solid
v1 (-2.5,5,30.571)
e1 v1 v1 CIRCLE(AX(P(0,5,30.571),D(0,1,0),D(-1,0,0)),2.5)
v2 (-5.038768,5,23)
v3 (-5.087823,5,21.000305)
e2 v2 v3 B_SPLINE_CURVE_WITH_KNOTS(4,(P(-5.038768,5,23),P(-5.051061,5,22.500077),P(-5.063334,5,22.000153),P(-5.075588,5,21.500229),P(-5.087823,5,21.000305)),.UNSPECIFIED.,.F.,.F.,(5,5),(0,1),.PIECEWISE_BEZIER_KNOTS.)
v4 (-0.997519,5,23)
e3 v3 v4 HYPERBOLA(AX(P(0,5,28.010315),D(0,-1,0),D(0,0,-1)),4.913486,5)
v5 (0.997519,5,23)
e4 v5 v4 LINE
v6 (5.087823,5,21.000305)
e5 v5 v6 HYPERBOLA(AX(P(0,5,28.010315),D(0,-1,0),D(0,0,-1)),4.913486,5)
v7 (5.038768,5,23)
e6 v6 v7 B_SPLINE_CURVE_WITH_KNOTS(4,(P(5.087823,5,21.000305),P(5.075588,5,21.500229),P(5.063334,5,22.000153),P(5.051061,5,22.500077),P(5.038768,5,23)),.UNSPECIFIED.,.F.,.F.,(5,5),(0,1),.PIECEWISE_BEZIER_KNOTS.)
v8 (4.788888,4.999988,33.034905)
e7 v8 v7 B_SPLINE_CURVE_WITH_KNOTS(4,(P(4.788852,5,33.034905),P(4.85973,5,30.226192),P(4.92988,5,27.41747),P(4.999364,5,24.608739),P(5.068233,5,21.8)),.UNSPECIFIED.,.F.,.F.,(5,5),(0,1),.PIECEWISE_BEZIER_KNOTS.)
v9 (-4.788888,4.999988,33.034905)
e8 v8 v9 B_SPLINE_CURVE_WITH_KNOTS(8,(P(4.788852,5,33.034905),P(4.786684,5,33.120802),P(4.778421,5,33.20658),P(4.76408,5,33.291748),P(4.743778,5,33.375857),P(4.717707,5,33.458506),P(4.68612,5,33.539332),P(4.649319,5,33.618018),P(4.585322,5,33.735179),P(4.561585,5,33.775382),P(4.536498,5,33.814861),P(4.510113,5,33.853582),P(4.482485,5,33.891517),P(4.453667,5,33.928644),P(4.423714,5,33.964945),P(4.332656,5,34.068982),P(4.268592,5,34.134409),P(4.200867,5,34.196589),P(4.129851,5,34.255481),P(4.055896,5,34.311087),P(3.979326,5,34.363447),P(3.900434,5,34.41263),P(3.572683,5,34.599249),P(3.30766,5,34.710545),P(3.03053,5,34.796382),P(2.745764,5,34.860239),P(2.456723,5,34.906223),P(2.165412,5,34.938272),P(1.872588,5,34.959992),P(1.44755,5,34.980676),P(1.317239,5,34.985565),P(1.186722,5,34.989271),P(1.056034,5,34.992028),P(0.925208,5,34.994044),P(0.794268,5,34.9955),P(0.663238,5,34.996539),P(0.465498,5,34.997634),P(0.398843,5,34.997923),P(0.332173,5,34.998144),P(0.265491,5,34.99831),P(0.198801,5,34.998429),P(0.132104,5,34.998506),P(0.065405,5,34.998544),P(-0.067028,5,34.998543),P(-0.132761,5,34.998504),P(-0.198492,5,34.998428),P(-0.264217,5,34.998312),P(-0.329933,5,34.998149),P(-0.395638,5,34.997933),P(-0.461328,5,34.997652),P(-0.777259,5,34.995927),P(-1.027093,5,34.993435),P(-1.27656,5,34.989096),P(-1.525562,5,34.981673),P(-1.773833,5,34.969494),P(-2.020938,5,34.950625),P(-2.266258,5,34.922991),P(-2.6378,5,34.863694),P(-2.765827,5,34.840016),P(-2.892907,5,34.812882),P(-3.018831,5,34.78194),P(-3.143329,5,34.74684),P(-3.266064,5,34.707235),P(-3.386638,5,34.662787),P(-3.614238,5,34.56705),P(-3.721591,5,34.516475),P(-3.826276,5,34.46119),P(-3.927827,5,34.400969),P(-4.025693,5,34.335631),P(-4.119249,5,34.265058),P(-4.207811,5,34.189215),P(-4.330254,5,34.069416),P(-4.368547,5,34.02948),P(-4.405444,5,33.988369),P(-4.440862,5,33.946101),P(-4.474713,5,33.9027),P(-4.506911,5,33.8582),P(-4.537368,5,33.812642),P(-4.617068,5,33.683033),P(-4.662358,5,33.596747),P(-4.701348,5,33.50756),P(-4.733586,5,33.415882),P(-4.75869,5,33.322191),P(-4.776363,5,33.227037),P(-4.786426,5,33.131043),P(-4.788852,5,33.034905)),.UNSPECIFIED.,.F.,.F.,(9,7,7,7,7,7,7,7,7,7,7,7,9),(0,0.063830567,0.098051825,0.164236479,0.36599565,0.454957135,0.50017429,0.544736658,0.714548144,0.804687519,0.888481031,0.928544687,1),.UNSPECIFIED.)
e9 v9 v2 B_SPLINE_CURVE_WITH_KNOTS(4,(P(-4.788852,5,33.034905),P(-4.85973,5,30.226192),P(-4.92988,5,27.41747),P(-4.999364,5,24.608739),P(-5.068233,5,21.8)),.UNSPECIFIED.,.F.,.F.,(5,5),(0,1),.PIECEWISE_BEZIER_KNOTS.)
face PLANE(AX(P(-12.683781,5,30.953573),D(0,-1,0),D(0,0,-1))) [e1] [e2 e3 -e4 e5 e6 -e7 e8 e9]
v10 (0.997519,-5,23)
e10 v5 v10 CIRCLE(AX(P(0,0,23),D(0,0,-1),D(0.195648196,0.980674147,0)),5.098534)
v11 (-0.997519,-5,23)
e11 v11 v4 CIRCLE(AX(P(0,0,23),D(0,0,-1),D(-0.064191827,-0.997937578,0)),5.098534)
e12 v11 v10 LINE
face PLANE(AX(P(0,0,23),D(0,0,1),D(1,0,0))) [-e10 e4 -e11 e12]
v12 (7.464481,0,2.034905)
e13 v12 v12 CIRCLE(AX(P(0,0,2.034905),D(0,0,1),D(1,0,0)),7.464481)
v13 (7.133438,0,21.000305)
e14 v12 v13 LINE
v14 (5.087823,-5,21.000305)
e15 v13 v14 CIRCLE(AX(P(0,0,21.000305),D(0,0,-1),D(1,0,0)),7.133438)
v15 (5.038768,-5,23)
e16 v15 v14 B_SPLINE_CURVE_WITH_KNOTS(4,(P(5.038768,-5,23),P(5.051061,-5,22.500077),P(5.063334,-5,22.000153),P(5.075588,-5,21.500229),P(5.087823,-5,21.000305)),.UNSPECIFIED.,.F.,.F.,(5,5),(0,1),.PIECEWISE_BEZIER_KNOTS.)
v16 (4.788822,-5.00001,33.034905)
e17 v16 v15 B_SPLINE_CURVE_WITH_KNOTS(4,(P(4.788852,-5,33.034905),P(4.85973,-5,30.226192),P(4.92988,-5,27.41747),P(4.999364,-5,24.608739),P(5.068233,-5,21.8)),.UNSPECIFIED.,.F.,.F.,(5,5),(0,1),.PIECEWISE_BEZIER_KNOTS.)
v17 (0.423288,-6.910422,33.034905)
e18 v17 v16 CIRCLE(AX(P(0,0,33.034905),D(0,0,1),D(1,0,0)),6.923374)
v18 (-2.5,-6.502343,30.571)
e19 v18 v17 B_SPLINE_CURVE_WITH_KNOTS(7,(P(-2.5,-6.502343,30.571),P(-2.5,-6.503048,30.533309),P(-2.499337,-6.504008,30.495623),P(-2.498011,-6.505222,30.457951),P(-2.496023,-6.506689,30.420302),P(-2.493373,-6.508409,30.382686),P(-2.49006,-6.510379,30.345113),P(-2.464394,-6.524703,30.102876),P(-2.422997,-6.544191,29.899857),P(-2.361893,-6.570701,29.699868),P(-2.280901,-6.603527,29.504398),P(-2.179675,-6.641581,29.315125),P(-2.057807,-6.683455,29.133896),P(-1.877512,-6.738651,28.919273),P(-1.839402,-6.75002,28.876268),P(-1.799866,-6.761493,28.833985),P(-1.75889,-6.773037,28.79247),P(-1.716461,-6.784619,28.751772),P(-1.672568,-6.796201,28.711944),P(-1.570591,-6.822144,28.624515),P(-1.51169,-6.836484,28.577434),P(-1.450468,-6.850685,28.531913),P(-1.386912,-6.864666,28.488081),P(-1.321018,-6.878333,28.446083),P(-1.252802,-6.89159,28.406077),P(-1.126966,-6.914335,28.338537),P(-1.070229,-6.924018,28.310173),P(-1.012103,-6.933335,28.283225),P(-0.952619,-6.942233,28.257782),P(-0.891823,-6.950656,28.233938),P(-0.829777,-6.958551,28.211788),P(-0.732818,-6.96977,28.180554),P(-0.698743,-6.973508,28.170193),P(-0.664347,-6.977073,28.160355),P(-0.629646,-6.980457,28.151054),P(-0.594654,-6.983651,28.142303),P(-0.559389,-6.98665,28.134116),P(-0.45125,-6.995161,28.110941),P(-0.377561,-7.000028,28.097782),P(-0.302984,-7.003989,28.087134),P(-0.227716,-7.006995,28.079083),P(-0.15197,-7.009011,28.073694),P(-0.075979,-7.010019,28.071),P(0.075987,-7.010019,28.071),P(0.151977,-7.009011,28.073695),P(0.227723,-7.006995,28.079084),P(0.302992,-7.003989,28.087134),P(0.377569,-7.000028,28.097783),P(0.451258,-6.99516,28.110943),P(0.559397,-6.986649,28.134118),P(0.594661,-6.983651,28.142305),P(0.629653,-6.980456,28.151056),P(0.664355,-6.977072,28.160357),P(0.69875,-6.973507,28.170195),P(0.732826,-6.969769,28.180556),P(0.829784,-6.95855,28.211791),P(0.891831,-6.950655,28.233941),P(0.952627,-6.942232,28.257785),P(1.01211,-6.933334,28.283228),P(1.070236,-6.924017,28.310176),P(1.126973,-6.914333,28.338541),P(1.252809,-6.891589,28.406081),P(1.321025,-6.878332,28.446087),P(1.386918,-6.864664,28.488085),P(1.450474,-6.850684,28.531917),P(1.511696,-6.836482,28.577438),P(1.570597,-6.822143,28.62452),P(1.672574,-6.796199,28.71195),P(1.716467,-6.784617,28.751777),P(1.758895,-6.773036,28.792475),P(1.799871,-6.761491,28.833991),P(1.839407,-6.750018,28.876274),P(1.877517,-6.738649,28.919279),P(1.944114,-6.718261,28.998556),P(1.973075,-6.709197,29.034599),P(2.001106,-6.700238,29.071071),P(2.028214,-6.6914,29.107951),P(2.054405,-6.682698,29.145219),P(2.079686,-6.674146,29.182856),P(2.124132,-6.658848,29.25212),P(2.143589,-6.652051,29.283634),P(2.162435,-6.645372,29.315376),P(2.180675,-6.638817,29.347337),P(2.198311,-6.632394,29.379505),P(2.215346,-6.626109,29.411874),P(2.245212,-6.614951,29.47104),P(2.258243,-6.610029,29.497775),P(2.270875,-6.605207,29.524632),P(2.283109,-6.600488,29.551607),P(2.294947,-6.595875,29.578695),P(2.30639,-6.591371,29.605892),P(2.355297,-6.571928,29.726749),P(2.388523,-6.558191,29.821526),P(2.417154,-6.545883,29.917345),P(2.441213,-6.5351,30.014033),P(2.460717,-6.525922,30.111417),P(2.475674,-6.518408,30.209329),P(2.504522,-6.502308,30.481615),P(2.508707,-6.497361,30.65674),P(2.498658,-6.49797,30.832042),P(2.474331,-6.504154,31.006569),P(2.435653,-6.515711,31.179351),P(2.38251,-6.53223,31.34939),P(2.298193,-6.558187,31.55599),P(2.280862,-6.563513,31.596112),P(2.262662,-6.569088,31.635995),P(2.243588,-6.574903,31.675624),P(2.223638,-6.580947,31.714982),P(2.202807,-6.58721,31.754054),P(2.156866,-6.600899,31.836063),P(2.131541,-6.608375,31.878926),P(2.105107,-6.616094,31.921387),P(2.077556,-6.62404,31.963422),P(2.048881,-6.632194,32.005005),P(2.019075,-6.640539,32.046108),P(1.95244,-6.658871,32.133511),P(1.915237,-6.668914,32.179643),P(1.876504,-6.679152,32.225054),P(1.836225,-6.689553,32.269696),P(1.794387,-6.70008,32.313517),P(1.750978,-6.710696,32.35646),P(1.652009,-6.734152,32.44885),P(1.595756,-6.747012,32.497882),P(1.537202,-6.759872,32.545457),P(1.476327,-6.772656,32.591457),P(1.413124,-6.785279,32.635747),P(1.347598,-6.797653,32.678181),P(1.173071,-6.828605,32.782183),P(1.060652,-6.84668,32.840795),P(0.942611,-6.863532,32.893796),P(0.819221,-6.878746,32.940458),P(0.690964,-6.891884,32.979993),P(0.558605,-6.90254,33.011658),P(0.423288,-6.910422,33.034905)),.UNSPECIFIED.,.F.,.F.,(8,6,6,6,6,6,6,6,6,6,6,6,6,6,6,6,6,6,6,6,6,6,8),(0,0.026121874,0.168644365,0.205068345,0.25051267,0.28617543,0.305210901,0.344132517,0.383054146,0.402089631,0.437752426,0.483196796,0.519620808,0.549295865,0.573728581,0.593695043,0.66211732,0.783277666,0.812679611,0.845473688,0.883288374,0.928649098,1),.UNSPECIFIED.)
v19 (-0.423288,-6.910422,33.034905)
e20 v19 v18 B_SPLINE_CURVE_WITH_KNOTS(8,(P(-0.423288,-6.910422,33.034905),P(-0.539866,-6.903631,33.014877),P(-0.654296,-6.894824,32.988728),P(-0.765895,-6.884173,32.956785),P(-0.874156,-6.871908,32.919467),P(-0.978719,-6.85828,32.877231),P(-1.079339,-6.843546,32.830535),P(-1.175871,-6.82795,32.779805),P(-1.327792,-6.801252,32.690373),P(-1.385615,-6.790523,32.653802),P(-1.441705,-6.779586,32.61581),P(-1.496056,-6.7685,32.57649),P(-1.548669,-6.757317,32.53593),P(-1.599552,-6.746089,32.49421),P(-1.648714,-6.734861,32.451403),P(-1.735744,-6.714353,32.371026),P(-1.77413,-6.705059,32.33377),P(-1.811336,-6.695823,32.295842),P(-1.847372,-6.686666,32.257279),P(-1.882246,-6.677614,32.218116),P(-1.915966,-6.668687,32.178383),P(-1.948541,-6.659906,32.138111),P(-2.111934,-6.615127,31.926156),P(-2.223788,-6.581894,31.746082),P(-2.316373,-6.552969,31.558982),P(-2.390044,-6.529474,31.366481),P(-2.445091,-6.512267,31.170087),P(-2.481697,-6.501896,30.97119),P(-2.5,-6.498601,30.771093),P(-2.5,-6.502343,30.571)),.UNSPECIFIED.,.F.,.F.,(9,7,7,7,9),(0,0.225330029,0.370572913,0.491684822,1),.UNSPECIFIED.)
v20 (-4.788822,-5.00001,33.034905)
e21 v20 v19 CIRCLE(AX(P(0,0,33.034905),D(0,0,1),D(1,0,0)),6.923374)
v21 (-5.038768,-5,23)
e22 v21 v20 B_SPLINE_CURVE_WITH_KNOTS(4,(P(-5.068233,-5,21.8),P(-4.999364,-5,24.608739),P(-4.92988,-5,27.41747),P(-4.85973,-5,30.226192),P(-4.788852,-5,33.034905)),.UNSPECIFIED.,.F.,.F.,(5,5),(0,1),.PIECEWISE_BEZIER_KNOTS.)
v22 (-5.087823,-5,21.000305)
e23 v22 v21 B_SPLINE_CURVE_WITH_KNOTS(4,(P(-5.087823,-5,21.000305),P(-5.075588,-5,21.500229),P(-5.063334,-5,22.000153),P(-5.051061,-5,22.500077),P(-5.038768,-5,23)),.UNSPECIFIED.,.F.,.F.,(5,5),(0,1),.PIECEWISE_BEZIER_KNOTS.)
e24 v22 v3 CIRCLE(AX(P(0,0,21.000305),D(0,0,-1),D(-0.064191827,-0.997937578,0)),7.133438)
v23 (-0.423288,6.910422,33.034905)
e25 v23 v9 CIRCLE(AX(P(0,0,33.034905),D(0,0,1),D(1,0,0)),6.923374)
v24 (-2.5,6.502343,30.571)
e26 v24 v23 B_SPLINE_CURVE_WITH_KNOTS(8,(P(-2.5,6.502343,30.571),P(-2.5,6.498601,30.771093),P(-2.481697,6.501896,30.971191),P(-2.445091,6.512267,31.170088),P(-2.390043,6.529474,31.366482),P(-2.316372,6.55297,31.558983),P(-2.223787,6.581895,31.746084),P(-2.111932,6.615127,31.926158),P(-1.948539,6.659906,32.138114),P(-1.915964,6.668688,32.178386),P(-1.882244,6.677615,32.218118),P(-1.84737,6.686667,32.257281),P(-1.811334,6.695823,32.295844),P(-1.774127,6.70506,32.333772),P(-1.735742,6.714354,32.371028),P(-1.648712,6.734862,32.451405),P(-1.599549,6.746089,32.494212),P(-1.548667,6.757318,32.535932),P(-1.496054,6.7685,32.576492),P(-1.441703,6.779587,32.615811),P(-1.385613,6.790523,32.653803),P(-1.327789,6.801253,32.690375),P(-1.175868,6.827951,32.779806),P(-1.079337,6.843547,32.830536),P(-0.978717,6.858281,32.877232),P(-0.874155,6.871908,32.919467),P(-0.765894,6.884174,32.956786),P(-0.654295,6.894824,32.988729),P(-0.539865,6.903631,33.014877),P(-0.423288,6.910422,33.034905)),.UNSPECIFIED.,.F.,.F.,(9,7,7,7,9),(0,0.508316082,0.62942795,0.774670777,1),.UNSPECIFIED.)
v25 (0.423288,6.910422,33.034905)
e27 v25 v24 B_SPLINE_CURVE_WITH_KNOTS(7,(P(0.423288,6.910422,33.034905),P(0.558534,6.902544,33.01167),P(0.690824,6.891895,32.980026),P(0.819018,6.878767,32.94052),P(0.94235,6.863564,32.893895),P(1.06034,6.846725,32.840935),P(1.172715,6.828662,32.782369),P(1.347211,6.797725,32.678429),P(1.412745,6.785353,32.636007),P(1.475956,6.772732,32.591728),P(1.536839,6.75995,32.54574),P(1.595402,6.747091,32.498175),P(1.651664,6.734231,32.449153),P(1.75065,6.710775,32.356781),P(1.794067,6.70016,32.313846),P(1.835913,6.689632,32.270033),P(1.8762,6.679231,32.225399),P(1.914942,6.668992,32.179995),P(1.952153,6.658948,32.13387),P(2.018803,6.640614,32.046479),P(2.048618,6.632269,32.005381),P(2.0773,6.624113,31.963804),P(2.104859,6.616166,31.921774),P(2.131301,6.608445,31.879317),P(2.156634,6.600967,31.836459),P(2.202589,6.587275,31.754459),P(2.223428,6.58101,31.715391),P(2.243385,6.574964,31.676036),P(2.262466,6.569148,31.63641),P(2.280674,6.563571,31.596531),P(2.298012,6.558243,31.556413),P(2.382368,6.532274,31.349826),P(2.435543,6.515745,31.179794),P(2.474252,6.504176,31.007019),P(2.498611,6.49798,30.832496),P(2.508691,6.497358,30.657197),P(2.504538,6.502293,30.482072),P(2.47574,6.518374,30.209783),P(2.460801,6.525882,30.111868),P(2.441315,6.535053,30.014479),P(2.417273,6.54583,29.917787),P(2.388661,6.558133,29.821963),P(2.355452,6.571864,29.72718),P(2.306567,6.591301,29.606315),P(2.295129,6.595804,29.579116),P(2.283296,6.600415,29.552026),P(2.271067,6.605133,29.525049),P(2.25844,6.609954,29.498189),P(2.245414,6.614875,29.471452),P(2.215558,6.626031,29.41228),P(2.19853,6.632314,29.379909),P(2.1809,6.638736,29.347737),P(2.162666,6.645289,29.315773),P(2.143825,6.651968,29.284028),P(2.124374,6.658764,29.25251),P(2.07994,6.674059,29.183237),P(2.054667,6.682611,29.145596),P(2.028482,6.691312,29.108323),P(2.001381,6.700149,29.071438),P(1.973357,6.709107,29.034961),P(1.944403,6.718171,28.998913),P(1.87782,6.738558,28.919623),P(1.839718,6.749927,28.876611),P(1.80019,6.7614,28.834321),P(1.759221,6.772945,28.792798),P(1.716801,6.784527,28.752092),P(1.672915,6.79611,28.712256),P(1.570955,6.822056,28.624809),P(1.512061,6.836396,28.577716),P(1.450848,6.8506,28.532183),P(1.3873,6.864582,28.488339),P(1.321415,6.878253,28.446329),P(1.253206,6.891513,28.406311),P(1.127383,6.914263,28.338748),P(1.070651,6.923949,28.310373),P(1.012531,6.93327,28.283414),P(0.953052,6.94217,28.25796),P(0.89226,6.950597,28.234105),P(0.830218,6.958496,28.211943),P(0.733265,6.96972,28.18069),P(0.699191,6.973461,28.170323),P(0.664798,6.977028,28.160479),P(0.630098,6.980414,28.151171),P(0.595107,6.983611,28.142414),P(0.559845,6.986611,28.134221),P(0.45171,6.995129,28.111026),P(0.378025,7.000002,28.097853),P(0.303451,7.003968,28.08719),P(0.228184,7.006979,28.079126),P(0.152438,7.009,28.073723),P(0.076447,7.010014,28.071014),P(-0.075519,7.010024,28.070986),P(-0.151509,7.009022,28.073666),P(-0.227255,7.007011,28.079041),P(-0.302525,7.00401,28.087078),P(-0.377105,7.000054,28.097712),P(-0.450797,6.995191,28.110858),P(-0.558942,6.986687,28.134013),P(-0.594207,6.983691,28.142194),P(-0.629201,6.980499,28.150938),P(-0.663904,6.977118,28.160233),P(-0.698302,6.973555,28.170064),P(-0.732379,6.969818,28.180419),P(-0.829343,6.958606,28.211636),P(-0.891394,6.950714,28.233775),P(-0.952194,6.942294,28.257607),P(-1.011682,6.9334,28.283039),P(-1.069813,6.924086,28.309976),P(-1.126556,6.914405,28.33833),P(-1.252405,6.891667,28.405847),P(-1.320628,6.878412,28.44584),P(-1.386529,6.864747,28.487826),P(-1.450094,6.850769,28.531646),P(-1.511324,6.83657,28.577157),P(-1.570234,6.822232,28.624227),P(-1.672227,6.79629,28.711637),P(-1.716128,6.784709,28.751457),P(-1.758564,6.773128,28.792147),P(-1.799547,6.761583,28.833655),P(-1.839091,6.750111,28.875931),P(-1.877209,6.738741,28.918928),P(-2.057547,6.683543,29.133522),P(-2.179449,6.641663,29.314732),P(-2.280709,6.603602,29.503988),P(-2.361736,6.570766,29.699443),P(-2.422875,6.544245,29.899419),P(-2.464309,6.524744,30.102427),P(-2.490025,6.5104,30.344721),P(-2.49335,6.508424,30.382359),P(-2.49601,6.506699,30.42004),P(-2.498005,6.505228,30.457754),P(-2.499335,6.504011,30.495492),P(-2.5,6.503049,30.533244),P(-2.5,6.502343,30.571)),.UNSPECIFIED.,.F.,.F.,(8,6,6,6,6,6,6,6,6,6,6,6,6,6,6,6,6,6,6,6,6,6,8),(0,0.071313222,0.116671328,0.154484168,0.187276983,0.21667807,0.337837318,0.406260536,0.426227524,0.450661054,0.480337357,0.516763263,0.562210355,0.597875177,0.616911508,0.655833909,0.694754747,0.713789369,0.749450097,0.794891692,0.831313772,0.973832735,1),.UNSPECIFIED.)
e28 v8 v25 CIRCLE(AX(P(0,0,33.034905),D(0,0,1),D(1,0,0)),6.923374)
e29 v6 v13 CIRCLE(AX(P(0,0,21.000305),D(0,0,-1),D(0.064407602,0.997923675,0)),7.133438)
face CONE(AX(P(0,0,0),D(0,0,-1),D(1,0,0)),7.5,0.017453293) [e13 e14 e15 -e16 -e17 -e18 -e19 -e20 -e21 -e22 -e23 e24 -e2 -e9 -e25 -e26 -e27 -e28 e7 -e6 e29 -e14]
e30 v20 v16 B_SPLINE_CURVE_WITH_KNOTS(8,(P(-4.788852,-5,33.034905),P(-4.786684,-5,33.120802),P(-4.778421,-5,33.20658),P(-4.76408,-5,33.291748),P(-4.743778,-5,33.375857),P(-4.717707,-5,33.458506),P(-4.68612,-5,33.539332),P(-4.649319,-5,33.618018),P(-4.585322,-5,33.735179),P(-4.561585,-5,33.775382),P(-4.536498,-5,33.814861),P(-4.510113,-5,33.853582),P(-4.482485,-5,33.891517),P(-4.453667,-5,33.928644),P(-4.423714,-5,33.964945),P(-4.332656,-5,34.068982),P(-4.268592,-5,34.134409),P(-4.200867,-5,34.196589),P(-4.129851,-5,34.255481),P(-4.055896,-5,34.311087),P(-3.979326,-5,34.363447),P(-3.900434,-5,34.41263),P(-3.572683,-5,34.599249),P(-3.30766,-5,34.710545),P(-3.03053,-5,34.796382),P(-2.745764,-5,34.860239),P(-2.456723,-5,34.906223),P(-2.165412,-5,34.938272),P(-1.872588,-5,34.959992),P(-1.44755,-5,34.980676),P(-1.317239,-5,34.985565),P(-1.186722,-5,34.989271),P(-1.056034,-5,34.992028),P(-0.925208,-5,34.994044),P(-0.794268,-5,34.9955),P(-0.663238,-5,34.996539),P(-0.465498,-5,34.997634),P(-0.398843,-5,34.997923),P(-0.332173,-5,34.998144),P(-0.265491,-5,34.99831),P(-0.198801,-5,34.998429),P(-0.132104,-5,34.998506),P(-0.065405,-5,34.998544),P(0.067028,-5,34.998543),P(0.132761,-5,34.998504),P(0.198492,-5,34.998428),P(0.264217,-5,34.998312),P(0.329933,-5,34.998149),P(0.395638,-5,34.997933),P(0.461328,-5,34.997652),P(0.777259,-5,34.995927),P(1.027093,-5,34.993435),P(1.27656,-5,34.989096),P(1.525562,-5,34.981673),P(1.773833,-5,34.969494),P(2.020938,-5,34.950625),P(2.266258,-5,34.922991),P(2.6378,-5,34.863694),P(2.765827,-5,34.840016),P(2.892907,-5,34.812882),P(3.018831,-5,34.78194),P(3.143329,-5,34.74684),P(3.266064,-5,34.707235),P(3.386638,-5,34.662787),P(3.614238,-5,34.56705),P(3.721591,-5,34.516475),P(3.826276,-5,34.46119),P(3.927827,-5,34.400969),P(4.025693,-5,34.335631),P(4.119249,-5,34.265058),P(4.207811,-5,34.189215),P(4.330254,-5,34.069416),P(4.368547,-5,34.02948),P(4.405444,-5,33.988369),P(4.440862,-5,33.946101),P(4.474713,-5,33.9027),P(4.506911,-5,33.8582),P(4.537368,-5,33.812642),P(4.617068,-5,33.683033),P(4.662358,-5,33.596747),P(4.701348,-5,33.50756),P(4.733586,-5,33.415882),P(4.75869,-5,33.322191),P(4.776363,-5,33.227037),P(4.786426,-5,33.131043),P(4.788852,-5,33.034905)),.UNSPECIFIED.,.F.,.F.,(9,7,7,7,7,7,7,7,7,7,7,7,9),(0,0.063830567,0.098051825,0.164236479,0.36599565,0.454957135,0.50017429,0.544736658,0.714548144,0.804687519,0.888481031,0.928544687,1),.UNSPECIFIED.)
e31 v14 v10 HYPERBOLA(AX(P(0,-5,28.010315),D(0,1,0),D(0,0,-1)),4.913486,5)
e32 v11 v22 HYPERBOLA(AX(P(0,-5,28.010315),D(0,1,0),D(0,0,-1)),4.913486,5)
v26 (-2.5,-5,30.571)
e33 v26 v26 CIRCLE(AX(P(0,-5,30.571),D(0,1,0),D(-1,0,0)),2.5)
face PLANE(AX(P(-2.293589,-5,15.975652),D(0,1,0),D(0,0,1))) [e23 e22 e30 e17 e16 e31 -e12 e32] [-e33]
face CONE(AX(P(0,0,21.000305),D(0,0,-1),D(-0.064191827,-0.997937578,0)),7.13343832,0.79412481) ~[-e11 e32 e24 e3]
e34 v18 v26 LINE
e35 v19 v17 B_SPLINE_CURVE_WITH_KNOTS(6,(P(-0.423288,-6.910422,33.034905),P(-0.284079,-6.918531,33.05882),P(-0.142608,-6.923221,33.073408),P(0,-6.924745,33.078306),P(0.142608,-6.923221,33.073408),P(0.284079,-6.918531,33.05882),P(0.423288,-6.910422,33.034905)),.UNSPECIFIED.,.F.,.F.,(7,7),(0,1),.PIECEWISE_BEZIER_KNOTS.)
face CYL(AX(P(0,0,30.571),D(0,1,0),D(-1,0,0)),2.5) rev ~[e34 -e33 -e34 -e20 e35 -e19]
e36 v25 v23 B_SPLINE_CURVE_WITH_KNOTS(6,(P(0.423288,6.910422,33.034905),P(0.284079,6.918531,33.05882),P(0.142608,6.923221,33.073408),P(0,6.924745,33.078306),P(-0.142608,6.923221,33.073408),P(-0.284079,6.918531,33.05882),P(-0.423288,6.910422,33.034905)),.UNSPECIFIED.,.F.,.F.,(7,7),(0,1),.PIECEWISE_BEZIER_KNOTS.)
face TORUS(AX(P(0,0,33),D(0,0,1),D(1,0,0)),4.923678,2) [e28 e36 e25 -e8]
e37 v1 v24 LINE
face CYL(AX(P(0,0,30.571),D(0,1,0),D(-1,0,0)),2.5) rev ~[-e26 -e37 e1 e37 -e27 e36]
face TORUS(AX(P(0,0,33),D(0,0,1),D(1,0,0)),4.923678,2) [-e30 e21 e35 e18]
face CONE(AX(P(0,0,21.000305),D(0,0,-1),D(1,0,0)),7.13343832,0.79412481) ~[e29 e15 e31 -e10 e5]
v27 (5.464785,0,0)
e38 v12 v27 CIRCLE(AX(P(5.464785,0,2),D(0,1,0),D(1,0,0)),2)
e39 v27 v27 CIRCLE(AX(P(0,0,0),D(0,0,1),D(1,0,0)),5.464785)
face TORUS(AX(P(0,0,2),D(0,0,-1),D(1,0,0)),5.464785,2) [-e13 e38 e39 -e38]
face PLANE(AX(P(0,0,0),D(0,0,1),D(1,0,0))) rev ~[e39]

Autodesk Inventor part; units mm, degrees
ref_plane "YZ Plane" through (0, 0, 0) normal (1, 0, 0) x (0, 1, 0)
ref_plane "XZ Plane" through (0, 0, 0) normal (0, 1, 0) x (-1, 0, 0)
ref_plane "XY Plane" through (0, 0, 0) normal (0, 0, 1) x (1, 0, 0)
sketch "Sketch1" plane through (0, 0, 0) normal (0, 0, 1) x (1, 0, 0)
  circle A0 centre (0, 0) radius 7.5
  dimension "d0" = 15
extrude "Extrusion1" add sketch "Sketch1" along normal blind 35 draft -1
fillet "Fillet1" radius 2 2 edges at (-6.8891, 0, 35) (-7.5, 0, 0)
sketch "Sketch2" plane through (0, 0, 0) normal (0, 0, -1) x (-1, 0, 0)
  point P0 (0, 0)
sketch "Sketch3" plane through (0, 0, 0) normal (0, 0, -1) x (-1, 0, 0)
  circle A0 centre (0, 0) radius 4.9237 projected
  line L0 (0, 0) -> (5.0385, 0)
  line L1 (5.0385, 0) -> (5.0385, 5)
  line L2 (5.0385, 5) -> (-5.7641, 5)
  line L3 (-5.7641, 5) -> (-5.7641, 0)
  circle A1 centre (0, 0) radius 6.9234 projected
  line L4 (-5.7641, 0) -> (0, 0)
  dimension "d4" = 5
  dimension "d5" = 5
  dimension "d6" = 90
sketch "Sketch4" plane through (0, 0, 0) normal (0, 1, 0) x (-1, 0, 0)
  circle A0 centre (0, 30.571) radius 2.5
  point P0 (0, 0)
  dimension "d7" = 5
extrude "Extrusion2" cut sketch "Sketch4" against normal through all both and the other way through all
sketch "Sketch6" plane through (0, 0, 35) normal (0, 0, 1) x (1, 0, 0)
  arc A0 (-0.4232, 6.9104) -> (-0.4232, -6.9104) centre (0, 0) ccw projected
  line L0 (-4.7889, 5) -> (4.7889, 5)
  arc A1 (0.4232, -6.9104) -> (0.4232, 6.9104) centre (0, 0) ccw projected
  line L1 (-4.7889, 5) -> (-5.5424, 5)
  circle A2 centre (0, 0) radius 7.4645 projected
  line L2 (4.7889, 5) -> (5.5429, 5)
  line L3 (-5.5424, -5) -> (5.5424, -5)
  arc A3 (-5.5424, 5) -> (-5.5424, -5) centre (0, 0) ccw
  arc A4 (5.5424, -5) -> (5.5429, 5) centre (-0.0007, 0.0003) ccw
  point P0 (0, 0)
  dimension "d14" = 5
  dimension "d15" = 5
extrude "Extrusion4" cut sketch "Sketch6" against normal blind 12 contours L0 A1 L3 A0 | A0 L3 A2 L1 | L2 A2 L3 A1
chamfer "Chamfer1" distance 2 angle 45 2 edges at (6.5634, -2.7038, 23) (-7.0985, 0, 23)
sketch "Sketch7" plane through (0, 0, 0) normal (0, 1, 0) x (-1, 0, 0)
  point P0 (0, 0)
properties part number "bicep"
